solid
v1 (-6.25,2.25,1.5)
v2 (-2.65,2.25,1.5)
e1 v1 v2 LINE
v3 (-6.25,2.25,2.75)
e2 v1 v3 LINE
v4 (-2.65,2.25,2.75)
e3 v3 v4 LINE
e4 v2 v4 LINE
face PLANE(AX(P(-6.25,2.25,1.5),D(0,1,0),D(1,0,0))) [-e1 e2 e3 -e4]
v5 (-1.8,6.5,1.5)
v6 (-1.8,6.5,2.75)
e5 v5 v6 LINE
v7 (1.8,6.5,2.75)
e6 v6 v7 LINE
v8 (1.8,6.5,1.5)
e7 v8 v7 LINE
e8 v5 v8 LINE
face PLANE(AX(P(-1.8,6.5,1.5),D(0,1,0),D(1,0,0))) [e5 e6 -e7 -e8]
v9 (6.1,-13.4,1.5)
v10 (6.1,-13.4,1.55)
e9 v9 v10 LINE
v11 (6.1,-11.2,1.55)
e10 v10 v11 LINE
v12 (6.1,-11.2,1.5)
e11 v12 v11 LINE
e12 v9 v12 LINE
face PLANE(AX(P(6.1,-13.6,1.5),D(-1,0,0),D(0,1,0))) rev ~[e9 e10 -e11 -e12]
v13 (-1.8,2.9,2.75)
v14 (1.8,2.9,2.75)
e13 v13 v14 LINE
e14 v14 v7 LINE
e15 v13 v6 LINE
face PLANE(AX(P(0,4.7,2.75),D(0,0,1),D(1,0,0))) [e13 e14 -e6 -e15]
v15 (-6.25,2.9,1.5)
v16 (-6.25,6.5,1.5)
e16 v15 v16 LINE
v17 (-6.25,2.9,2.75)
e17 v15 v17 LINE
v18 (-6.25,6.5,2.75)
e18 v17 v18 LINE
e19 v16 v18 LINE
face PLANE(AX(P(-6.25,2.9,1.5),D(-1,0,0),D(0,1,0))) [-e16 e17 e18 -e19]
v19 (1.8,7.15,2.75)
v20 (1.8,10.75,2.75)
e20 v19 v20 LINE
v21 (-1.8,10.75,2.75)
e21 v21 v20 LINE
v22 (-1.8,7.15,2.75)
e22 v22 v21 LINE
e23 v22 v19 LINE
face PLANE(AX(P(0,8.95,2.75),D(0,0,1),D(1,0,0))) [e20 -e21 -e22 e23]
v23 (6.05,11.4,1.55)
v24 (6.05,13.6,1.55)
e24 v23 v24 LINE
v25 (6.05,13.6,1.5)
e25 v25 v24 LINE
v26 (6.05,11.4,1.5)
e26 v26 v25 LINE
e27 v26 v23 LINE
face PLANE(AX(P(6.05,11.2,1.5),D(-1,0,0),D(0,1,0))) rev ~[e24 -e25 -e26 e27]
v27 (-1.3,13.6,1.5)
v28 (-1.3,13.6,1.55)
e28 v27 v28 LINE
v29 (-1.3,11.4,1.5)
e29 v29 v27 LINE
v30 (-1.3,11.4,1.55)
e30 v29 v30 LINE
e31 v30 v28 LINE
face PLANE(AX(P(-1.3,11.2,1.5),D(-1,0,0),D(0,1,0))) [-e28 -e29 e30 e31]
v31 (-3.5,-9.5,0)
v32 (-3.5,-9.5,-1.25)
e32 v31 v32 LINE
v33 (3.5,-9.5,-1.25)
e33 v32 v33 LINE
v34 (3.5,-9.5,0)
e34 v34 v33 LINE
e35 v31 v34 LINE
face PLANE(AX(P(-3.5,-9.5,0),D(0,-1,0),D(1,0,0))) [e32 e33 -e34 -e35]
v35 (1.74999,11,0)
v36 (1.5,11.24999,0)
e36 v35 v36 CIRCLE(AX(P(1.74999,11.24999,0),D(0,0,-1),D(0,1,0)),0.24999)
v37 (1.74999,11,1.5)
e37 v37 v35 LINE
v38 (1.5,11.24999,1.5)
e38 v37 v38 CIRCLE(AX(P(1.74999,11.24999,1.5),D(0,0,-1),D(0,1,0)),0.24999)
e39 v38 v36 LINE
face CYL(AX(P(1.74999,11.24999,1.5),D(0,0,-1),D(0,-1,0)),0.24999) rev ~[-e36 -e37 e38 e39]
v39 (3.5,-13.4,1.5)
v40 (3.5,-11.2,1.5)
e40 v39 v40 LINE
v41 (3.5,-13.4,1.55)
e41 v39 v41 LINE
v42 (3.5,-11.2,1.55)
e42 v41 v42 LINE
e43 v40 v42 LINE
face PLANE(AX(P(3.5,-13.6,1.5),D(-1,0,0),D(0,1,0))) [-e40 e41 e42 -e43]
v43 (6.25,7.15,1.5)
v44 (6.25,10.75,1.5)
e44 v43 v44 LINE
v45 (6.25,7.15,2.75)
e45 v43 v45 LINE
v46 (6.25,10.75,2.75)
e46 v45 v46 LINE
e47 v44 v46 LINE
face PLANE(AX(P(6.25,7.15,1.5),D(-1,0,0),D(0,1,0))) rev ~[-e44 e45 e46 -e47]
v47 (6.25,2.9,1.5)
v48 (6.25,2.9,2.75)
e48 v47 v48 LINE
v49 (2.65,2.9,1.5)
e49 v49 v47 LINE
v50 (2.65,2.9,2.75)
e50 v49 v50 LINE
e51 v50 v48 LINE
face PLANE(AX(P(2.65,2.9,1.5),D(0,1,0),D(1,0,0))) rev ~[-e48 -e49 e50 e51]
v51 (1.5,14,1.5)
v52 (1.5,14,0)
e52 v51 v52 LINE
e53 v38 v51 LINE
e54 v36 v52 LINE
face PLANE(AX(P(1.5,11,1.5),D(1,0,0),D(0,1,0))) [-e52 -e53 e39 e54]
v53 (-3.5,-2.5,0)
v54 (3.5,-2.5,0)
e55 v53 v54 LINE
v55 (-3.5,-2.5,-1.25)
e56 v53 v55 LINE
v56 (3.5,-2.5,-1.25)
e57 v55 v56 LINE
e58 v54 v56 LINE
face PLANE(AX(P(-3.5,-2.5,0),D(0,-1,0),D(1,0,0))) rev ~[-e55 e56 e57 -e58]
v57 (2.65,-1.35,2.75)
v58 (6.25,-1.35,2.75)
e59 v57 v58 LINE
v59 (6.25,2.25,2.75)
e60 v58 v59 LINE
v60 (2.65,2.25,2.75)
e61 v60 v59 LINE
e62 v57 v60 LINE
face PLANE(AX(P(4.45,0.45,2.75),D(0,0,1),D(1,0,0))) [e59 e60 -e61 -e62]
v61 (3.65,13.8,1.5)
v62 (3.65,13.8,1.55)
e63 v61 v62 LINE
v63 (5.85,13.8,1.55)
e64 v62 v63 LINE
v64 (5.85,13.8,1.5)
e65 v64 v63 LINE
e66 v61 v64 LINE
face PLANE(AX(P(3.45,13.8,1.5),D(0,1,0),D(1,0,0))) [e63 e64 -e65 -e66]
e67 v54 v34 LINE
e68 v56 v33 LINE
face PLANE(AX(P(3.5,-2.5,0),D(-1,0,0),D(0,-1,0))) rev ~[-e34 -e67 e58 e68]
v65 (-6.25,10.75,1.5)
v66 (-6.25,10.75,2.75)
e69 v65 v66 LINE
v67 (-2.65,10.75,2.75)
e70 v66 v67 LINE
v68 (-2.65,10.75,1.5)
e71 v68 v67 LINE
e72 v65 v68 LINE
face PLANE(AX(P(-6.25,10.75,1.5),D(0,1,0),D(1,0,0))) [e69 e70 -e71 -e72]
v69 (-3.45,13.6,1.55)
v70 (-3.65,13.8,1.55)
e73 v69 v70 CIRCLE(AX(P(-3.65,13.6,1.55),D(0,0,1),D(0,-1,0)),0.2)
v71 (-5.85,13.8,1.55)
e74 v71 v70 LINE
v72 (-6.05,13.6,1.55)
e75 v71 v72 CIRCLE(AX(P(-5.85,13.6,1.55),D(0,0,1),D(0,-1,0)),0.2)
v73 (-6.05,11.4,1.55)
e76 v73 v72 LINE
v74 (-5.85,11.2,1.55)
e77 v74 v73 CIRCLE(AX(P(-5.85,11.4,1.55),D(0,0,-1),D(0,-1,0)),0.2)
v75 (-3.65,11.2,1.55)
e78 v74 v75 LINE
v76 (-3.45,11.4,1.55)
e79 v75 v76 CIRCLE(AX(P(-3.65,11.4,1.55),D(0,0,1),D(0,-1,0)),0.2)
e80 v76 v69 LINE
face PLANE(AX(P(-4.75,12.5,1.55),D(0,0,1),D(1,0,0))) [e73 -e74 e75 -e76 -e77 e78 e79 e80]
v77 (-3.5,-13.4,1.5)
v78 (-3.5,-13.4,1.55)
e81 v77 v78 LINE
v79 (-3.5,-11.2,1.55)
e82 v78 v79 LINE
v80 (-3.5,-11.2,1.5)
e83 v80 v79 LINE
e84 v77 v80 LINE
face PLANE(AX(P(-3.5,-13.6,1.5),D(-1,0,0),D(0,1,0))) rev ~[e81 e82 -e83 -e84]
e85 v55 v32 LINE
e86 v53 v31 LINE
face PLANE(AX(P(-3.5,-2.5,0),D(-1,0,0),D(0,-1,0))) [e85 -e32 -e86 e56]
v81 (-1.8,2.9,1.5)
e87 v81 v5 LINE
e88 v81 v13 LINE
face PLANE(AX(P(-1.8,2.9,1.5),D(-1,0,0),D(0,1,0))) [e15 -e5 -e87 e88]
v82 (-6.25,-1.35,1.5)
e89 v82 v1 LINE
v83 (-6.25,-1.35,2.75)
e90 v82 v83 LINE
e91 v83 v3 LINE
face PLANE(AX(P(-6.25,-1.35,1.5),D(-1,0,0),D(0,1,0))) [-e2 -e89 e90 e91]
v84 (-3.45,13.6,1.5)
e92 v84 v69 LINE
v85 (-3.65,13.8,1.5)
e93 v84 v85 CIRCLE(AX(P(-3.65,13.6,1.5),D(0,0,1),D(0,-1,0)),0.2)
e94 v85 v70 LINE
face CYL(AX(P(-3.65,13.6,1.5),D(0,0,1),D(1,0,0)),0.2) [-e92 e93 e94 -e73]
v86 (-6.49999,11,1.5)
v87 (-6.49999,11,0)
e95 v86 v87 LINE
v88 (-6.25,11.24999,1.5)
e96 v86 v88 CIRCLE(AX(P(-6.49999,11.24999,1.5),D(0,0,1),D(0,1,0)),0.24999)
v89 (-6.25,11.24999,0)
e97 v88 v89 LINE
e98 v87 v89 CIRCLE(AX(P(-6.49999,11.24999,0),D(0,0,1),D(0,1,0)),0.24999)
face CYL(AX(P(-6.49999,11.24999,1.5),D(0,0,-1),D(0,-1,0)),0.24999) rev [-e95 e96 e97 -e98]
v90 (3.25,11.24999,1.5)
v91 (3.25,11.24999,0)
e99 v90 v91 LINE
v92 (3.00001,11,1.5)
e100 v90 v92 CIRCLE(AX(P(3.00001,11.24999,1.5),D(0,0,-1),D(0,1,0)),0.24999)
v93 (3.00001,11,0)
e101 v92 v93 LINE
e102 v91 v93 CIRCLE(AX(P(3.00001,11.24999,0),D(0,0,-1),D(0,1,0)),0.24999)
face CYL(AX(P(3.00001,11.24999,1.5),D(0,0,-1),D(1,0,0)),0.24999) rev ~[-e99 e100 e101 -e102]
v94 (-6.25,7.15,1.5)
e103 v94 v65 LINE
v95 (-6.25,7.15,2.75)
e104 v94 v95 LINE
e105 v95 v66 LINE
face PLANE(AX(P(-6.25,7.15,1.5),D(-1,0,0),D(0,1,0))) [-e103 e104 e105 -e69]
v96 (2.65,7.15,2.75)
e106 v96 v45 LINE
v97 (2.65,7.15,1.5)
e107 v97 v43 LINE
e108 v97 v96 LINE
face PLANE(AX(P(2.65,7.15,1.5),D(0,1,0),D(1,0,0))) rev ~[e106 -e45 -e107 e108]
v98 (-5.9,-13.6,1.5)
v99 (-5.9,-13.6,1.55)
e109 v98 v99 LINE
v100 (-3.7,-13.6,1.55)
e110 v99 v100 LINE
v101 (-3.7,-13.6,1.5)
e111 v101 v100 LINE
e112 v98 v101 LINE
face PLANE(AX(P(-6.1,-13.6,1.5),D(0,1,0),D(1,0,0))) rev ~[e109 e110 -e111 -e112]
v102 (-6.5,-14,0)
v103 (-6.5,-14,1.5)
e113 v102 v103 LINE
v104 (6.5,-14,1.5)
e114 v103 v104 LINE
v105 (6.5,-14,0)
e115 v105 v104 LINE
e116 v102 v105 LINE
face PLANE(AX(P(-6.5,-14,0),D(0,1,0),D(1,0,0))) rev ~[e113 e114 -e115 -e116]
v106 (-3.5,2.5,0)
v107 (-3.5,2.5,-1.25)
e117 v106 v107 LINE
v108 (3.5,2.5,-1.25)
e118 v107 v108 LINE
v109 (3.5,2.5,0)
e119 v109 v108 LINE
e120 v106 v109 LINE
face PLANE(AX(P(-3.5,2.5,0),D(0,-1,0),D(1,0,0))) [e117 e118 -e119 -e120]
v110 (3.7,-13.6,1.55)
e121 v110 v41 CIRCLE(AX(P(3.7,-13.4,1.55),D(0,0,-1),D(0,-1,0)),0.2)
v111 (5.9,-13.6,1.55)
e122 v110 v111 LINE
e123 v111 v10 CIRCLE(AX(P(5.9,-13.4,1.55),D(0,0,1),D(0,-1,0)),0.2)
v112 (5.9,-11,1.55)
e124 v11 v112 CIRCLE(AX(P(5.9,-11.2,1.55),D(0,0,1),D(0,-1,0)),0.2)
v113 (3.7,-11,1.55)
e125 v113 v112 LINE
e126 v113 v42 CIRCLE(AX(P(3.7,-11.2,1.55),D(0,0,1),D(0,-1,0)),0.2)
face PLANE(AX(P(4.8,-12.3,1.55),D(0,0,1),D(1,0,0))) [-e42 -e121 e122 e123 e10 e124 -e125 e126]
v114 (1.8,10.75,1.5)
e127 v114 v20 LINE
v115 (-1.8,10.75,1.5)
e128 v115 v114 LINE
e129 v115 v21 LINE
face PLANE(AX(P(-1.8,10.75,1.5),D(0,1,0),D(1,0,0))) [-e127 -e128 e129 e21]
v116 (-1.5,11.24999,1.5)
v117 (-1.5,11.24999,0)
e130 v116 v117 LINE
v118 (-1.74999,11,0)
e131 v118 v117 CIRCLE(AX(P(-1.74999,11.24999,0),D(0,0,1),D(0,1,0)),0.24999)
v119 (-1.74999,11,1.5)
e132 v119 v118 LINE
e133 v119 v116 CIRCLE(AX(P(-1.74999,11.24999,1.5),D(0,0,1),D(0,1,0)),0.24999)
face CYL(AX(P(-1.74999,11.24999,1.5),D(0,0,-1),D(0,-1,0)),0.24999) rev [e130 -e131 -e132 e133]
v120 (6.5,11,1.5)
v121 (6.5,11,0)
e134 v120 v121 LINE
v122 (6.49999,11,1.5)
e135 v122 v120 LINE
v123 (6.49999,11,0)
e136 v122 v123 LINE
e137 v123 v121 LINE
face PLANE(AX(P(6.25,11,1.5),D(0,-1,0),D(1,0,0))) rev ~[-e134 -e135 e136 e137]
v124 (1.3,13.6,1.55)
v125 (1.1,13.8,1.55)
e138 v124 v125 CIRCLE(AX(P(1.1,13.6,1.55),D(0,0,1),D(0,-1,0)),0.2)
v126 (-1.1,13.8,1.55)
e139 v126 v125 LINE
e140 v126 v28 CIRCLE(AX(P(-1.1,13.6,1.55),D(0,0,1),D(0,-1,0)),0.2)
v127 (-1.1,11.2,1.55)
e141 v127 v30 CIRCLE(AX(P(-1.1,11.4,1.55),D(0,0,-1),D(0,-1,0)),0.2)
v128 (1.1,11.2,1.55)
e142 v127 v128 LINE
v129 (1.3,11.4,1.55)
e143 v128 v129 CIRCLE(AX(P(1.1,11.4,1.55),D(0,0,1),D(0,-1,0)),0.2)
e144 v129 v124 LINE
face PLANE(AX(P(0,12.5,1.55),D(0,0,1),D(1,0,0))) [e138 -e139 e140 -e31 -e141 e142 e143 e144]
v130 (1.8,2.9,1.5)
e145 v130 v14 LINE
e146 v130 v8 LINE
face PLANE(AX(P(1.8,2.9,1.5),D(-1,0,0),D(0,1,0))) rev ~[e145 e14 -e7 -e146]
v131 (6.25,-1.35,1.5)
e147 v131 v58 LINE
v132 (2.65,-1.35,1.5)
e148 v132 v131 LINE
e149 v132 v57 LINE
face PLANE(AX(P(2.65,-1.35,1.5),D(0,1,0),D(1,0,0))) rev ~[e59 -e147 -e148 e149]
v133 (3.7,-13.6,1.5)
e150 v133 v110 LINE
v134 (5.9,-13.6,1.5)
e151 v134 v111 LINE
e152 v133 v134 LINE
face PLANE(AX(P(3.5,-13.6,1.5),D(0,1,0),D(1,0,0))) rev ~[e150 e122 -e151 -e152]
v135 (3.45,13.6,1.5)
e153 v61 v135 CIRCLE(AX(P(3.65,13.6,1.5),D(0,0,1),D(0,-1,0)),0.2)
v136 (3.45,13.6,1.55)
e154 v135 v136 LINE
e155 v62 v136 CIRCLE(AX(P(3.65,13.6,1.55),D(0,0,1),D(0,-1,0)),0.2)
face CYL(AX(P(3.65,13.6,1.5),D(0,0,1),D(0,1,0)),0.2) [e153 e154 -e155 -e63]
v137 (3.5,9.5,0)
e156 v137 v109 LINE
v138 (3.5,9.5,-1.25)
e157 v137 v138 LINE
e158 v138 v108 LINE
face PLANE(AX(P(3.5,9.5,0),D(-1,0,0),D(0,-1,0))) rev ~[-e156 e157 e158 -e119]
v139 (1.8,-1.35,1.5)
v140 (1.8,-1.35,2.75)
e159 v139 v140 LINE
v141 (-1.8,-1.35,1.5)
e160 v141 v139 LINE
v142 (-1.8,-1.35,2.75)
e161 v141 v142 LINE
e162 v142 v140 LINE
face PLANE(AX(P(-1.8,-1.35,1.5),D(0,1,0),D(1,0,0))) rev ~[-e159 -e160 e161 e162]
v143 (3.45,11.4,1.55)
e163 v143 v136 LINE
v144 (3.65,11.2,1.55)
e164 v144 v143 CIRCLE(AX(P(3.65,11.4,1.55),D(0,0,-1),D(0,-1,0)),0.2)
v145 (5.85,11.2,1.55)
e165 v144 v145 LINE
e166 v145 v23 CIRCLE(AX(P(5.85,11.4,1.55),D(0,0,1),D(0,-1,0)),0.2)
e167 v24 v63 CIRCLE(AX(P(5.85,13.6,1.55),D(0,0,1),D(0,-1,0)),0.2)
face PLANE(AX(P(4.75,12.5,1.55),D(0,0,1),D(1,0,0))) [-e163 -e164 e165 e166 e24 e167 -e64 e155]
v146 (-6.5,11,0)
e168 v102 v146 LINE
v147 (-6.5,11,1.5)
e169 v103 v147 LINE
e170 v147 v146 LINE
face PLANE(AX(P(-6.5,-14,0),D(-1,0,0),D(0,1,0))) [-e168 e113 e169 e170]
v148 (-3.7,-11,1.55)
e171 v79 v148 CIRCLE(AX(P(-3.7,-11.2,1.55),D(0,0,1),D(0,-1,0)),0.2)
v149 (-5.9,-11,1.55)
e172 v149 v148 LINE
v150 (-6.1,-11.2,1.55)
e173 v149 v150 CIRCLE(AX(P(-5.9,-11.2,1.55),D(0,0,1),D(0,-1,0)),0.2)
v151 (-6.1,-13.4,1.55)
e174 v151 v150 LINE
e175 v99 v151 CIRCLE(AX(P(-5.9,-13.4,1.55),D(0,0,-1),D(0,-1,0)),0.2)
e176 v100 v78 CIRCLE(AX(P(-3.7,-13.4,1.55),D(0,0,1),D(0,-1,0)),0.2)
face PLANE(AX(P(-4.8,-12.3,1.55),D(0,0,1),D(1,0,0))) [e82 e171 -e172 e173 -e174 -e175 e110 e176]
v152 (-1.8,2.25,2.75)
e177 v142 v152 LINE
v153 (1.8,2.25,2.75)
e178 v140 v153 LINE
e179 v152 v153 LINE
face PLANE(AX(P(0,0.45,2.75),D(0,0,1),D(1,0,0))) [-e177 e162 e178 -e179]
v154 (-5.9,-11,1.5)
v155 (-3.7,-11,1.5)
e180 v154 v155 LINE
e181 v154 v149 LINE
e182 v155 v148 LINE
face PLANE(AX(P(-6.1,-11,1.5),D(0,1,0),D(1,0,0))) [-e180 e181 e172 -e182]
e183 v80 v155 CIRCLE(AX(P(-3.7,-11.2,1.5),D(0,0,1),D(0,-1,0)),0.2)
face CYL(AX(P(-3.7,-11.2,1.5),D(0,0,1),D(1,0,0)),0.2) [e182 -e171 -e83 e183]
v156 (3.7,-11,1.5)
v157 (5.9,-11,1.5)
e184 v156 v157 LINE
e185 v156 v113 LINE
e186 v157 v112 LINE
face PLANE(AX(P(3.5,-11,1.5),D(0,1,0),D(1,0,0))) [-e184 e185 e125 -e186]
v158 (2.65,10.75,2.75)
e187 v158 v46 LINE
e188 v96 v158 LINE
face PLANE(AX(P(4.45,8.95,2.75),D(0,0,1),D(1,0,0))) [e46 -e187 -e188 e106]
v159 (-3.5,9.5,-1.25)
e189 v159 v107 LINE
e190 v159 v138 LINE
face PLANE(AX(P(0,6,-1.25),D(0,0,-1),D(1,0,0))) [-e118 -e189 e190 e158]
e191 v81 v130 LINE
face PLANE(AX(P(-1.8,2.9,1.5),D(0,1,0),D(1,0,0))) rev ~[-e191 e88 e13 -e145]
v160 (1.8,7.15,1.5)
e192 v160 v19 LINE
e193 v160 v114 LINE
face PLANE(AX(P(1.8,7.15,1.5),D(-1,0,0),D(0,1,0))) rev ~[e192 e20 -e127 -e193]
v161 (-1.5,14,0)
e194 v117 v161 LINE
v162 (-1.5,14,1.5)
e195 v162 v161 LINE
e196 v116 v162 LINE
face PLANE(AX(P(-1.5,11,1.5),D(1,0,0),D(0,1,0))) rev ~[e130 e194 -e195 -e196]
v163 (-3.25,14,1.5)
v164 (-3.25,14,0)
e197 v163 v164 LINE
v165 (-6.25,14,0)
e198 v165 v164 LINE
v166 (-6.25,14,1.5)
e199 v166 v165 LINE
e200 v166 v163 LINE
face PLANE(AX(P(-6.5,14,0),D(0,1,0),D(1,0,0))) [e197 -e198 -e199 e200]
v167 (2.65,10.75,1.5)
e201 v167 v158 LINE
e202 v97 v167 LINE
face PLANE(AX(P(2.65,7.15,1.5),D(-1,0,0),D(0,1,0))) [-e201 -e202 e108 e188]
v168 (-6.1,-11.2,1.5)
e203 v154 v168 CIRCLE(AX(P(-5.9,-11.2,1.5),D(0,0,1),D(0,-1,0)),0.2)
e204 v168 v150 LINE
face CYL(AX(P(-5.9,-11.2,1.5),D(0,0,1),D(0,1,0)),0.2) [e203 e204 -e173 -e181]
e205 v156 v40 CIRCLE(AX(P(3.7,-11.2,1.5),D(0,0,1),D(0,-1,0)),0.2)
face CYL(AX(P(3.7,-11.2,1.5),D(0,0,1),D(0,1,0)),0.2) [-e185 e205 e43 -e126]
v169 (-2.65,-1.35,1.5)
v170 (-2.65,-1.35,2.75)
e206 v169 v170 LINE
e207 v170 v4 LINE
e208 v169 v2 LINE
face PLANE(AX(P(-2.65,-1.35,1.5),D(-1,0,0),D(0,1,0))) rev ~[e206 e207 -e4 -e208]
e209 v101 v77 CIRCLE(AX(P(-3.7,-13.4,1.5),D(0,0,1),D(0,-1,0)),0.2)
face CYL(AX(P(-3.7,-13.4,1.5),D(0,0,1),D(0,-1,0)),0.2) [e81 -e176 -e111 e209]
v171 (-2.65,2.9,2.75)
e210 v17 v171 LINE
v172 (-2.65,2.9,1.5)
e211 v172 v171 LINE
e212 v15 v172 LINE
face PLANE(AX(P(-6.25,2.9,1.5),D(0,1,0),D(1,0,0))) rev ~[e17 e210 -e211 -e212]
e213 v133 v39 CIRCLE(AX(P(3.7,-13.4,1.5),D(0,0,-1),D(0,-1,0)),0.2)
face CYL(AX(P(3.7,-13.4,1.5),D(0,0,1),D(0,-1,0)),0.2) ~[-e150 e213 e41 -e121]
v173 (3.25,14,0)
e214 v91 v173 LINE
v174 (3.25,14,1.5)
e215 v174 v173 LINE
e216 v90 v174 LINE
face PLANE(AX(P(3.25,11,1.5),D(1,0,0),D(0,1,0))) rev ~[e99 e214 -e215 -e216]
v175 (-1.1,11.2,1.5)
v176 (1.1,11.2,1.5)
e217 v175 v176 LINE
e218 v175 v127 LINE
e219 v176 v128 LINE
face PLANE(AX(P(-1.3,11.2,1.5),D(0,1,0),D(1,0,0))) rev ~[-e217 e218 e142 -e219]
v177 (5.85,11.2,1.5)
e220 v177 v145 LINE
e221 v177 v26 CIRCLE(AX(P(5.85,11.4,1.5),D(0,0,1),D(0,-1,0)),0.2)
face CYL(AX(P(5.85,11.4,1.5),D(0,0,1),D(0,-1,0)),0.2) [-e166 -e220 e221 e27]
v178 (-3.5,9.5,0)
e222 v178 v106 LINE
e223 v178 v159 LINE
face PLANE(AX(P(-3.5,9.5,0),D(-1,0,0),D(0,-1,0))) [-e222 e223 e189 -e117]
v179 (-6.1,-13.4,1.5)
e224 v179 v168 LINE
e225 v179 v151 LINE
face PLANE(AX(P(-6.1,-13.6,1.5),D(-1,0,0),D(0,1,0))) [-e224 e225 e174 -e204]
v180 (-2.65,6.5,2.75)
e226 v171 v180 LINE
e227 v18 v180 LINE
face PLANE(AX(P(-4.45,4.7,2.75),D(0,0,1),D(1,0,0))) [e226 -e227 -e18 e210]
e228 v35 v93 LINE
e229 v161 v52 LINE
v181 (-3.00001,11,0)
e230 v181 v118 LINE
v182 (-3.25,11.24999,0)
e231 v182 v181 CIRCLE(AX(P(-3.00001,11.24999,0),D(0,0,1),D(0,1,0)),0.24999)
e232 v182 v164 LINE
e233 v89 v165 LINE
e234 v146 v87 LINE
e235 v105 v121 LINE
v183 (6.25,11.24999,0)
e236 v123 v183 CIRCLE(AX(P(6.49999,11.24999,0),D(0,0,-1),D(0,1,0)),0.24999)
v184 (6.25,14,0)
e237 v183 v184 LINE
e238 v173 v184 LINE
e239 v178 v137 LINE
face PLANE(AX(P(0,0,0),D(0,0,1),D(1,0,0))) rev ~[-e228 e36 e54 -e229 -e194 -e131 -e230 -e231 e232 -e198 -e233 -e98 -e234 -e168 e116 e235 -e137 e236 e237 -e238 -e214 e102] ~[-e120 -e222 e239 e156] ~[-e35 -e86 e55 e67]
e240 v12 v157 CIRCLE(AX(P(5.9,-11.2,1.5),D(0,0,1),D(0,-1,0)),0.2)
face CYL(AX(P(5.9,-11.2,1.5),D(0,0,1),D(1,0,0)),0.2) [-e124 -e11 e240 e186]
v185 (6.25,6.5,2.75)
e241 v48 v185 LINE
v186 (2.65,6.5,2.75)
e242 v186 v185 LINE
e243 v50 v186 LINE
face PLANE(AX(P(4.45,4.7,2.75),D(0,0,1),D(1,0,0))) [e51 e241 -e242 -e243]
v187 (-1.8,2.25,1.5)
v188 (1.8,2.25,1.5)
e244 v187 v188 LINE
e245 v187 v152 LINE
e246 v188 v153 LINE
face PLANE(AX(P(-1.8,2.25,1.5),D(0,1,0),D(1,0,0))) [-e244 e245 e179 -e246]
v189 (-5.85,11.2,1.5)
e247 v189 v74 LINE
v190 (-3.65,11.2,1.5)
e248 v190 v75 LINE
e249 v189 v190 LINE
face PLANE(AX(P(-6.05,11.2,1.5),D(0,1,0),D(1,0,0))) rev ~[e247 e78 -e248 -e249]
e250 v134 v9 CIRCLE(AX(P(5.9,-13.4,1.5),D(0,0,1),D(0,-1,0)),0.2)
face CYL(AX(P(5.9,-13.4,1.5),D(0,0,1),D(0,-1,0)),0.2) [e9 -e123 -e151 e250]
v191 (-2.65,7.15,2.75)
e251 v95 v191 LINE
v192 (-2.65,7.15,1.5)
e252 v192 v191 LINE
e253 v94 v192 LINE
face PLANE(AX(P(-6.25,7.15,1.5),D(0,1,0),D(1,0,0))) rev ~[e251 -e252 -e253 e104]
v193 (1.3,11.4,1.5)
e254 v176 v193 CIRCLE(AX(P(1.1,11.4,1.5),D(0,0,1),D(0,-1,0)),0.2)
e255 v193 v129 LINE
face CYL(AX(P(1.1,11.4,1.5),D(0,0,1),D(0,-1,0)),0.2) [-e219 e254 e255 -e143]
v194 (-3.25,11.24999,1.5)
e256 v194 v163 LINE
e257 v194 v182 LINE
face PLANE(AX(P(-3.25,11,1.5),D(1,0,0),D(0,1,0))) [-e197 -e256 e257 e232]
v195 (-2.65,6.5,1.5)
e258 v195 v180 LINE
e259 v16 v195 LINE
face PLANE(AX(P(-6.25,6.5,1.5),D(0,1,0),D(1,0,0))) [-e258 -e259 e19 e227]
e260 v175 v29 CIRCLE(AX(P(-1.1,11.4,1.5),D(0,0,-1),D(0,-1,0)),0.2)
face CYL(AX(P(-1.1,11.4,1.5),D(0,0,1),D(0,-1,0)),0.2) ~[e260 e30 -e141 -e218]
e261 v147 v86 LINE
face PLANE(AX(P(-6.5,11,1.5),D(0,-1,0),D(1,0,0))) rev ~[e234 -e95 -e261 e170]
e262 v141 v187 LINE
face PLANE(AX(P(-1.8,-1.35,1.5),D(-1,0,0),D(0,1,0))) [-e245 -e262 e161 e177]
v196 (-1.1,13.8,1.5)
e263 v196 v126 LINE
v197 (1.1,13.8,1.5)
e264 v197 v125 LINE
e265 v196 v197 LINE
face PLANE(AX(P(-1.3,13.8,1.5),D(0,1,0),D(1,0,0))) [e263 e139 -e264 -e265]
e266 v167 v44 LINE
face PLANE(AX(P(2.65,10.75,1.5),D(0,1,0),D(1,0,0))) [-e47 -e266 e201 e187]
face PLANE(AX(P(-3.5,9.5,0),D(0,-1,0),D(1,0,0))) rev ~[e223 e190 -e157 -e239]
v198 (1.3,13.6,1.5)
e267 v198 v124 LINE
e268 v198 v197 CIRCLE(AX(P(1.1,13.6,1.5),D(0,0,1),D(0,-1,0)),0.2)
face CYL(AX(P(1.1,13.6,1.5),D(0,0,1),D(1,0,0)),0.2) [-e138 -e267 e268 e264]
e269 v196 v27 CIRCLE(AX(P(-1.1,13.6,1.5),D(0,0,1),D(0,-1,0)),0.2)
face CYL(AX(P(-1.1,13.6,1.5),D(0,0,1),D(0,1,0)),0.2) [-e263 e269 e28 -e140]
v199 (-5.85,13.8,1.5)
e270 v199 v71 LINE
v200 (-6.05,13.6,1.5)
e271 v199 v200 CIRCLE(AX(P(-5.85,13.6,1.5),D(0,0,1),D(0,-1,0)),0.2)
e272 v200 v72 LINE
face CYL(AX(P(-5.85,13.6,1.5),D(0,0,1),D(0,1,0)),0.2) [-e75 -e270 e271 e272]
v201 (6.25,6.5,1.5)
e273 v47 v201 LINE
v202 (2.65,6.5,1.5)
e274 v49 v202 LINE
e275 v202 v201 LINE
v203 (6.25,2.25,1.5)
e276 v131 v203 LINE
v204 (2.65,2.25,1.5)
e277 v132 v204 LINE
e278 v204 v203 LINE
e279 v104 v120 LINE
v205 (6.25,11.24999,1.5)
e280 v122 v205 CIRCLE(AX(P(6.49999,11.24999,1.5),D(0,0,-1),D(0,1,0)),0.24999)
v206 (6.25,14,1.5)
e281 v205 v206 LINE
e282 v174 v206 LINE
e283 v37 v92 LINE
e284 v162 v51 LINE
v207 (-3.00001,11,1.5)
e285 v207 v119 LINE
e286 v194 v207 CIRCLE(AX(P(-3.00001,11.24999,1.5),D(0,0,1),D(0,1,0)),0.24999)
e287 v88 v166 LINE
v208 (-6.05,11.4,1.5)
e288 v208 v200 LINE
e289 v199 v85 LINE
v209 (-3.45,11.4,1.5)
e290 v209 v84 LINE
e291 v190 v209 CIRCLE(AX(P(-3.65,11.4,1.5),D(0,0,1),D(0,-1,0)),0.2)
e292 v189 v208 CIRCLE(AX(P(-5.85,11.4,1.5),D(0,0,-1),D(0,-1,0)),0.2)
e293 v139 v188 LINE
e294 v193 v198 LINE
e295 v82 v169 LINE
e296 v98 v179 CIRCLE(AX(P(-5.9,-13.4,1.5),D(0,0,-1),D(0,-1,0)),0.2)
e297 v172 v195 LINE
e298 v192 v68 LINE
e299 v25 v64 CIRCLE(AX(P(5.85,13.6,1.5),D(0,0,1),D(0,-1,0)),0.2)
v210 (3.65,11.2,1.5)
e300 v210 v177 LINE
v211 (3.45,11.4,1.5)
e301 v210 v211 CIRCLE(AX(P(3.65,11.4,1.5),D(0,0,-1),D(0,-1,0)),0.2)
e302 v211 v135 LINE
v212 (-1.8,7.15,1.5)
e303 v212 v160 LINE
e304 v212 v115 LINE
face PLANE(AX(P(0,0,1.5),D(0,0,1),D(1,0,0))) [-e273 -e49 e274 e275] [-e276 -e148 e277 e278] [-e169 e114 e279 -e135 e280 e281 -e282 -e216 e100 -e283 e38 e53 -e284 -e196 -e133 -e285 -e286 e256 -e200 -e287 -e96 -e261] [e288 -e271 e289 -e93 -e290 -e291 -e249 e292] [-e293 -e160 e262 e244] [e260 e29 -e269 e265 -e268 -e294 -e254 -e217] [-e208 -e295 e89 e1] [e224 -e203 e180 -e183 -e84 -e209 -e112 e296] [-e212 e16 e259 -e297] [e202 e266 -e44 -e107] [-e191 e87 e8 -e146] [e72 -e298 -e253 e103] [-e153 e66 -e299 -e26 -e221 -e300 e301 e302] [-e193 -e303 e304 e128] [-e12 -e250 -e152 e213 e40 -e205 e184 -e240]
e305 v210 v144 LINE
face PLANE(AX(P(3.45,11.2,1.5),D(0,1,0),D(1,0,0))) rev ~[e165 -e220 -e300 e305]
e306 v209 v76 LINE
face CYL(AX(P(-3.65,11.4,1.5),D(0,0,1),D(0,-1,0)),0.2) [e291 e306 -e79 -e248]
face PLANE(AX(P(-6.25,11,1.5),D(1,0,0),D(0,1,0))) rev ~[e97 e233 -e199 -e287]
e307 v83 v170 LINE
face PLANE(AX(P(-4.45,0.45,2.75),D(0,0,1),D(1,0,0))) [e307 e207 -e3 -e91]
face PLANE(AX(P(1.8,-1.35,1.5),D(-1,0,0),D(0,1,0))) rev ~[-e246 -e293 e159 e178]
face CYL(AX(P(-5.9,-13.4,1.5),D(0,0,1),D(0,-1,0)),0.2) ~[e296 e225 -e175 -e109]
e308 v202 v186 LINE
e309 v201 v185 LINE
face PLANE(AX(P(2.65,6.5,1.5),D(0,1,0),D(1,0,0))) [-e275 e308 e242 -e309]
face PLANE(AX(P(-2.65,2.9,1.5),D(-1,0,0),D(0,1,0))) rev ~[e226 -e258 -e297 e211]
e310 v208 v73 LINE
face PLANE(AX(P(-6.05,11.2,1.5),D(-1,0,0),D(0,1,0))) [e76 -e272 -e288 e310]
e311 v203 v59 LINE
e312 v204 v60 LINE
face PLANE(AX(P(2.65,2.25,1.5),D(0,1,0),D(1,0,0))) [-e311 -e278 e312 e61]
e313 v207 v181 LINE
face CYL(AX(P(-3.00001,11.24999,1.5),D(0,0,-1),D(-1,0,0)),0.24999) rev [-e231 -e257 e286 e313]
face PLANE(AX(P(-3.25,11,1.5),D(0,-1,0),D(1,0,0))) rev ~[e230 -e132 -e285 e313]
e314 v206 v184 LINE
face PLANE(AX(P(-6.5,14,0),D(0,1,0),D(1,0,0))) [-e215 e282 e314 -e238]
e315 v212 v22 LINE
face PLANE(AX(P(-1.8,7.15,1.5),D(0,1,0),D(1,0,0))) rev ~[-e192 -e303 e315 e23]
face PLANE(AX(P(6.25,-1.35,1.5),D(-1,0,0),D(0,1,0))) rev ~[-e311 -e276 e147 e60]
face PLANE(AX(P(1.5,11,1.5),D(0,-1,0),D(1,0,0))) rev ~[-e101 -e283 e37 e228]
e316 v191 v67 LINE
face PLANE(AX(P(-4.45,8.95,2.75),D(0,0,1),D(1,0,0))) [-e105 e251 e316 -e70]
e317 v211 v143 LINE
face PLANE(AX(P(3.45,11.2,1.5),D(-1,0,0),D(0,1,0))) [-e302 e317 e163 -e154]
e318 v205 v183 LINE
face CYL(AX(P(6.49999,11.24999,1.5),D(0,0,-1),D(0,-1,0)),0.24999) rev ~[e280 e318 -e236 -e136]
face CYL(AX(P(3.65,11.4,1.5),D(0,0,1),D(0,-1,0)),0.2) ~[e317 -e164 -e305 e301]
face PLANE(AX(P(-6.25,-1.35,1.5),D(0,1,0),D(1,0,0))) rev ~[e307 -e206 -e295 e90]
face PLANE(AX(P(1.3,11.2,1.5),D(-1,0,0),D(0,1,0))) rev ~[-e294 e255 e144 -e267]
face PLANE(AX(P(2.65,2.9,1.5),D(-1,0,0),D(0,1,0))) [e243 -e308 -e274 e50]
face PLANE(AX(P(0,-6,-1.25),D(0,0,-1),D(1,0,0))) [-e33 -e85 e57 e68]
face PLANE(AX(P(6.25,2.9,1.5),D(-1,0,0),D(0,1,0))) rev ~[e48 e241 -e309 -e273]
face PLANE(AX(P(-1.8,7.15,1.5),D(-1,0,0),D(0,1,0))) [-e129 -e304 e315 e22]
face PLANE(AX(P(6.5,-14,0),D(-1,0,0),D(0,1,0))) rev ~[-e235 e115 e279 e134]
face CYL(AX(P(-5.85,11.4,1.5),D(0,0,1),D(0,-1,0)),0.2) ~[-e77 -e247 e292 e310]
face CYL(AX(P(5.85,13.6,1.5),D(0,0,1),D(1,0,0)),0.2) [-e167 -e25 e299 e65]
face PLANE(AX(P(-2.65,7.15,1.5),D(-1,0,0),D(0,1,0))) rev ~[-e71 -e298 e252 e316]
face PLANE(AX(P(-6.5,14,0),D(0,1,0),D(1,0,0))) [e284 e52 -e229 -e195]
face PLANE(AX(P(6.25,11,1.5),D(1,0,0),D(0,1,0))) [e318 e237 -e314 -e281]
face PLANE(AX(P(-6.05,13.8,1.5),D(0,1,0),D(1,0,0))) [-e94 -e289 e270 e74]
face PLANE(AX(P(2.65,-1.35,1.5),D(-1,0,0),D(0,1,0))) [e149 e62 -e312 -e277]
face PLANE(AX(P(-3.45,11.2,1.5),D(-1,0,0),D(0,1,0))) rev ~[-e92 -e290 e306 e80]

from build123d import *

# Parameters (mm, degrees)
F0_W      = 13
F0_H      = 28
F1_DEPTH  = 1.5
F2_W      = 1.75
F2_H      = 3
F2_W_2    = 0.25
F3_DEPTH  = 25
F4_W      = 2.6
F4_H      = 2.6
F5_DEPTH  = 0.05
F6_R      = 0.2
F7_R      = 0.24999
F8_W      = 2.6
F8_H      = 2.6
F9_DEPTH  = 0.05
F10_R     = 0.2
F11_W     = 3.6
F11_H     = 3.6
F12_DEPTH = 1.25
F13_W     = 7
F13_H     = 7
F14_DEPTH = 1.25


# Not quite as in the source:
# - a fillet or chamfer is up to 0.001 mm smaller than in the source, because OpenCascade refuses the exact size


with BuildPart() as f1:
    # F0 (on Top) → F1 (new body)
    with BuildSketch(Plane.XY):
        Rectangle(F0_W, F0_H)
    extrude(amount=F1_DEPTH)

    # F2 (on face) → F3 (cut)
    with BuildSketch(Plane.XY.offset(1.5)):
        with Locations((-2.375, 12.5)):
            Rectangle(F2_W, F2_H)
        with Locations((2.375, 12.5)):
            Rectangle(F2_W, F2_H)
        with Locations((-6.375, 12.5)):
            Rectangle(F2_W_2, F2_H)
        with Locations((6.375, 12.5)):
            Rectangle(F2_W_2, F2_H)
    extrude(amount=-F3_DEPTH, mode=Mode.SUBTRACT)

    # F4 (on face) → F5 (join)
    with BuildSketch(Plane.XY.offset(1.5)):
        with Locations((-4.75, 12.5)):
            Rectangle(F4_W, F4_H)
        with Locations((0, 12.5)):
            Rectangle(F4_W, F4_H)
        with Locations((4.75, 12.5)):
            Rectangle(F4_W, F4_H)
    extrude(amount=F5_DEPTH)

    # F6
    f6_edges = [f1.edges().sort_by_distance(p)[0] for p in [
        (-6.05, 11.2, 1.525),
        (-6.05, 13.8, 1.525),
        (-3.45, 11.2, 1.525),
        (-3.45, 13.8, 1.525),
        (1.3, 13.8, 1.525),
        (-1.3, 13.8, 1.525),
        (1.3, 11.2, 1.525),
        (3.45, 13.8, 1.525),
        (6.05, 13.8, 1.525),
        (6.05, 11.2, 1.525),
        (-1.3, 11.2, 1.525),
        (3.45, 11.2, 1.525),
    ]]
    fillet(f6_edges, radius=F6_R)

    # F7 (radius 0.25 in the source; OpenCascade refuses exactly that, so slightly less here)
    f7_edges = [f1.edges().sort_by_distance(p)[0] for p in [
        (6.25, 11, 0.75),
        (-6.25, 11, 0.75),
        (-1.5, 11, 0.75),
        (3.25, 11, 0.75),
        (-3.25, 11, 0.75),
        (1.5, 11, 0.75),
    ]]
    fillet(f7_edges, radius=F7_R)

    # F8 (on face) → F9 (join)
    with BuildSketch(Plane.XY.offset(1.5)):
        with Locations((-4.8, -12.3)):
            Rectangle(F8_W, F8_H)
        with Locations((4.8, -12.3)):
            Rectangle(F8_W, F8_H)
    extrude(amount=F9_DEPTH)

    # F10
    f10_edges = [f1.edges().sort_by_distance(p)[0] for p in [
        (-6.1, -13.6, 1.525),
        (-3.5, -13.6, 1.525),
        (-6.1, -11, 1.525),
        (3.5, -13.6, 1.525),
        (6.1, -13.6, 1.525),
        (3.5, -11, 1.525),
        (-3.5, -11, 1.525),
        (6.1, -11, 1.525),
    ]]
    fillet(f10_edges, radius=F10_R)

    # F11 (on face) → F12 (join)
    with BuildSketch(Plane.XY.offset(1.5)):
        with Locations((-4.45, 8.95)):
            Rectangle(F11_W, F11_H)
        with Locations((0, 8.95)):
            Rectangle(F11_W, F11_H)
        with Locations((4.45, 8.95)):
            Rectangle(F11_W, F11_H)
        with Locations((4.45, 4.7)):
            Rectangle(F11_W, F11_H)
        with Locations((0, 4.7)):
            Rectangle(F11_W, F11_H)
        with Locations((-4.45, 4.7)):
            Rectangle(F11_W, F11_H)
        with Locations((4.45, 0.45)):
            Rectangle(F11_W, F11_H)
        with Locations((0, 0.45)):
            Rectangle(F11_W, F11_H)
        with Locations((-4.45, 0.45)):
            Rectangle(F11_W, F11_H)
    extrude(amount=F12_DEPTH)

    # F13 (on face) → F14 (join)
    with BuildSketch(Plane(origin=(0, 0, 0), x_dir=(1, 0, 0), z_dir=(0, 0, -1))):
        with Locations((0, -6)):
            Rectangle(F13_W, F13_H)
        with Locations((0, 6)):
            Rectangle(F13_W, F13_H)
    extrude(amount=F14_DEPTH)


solid = f1.part
